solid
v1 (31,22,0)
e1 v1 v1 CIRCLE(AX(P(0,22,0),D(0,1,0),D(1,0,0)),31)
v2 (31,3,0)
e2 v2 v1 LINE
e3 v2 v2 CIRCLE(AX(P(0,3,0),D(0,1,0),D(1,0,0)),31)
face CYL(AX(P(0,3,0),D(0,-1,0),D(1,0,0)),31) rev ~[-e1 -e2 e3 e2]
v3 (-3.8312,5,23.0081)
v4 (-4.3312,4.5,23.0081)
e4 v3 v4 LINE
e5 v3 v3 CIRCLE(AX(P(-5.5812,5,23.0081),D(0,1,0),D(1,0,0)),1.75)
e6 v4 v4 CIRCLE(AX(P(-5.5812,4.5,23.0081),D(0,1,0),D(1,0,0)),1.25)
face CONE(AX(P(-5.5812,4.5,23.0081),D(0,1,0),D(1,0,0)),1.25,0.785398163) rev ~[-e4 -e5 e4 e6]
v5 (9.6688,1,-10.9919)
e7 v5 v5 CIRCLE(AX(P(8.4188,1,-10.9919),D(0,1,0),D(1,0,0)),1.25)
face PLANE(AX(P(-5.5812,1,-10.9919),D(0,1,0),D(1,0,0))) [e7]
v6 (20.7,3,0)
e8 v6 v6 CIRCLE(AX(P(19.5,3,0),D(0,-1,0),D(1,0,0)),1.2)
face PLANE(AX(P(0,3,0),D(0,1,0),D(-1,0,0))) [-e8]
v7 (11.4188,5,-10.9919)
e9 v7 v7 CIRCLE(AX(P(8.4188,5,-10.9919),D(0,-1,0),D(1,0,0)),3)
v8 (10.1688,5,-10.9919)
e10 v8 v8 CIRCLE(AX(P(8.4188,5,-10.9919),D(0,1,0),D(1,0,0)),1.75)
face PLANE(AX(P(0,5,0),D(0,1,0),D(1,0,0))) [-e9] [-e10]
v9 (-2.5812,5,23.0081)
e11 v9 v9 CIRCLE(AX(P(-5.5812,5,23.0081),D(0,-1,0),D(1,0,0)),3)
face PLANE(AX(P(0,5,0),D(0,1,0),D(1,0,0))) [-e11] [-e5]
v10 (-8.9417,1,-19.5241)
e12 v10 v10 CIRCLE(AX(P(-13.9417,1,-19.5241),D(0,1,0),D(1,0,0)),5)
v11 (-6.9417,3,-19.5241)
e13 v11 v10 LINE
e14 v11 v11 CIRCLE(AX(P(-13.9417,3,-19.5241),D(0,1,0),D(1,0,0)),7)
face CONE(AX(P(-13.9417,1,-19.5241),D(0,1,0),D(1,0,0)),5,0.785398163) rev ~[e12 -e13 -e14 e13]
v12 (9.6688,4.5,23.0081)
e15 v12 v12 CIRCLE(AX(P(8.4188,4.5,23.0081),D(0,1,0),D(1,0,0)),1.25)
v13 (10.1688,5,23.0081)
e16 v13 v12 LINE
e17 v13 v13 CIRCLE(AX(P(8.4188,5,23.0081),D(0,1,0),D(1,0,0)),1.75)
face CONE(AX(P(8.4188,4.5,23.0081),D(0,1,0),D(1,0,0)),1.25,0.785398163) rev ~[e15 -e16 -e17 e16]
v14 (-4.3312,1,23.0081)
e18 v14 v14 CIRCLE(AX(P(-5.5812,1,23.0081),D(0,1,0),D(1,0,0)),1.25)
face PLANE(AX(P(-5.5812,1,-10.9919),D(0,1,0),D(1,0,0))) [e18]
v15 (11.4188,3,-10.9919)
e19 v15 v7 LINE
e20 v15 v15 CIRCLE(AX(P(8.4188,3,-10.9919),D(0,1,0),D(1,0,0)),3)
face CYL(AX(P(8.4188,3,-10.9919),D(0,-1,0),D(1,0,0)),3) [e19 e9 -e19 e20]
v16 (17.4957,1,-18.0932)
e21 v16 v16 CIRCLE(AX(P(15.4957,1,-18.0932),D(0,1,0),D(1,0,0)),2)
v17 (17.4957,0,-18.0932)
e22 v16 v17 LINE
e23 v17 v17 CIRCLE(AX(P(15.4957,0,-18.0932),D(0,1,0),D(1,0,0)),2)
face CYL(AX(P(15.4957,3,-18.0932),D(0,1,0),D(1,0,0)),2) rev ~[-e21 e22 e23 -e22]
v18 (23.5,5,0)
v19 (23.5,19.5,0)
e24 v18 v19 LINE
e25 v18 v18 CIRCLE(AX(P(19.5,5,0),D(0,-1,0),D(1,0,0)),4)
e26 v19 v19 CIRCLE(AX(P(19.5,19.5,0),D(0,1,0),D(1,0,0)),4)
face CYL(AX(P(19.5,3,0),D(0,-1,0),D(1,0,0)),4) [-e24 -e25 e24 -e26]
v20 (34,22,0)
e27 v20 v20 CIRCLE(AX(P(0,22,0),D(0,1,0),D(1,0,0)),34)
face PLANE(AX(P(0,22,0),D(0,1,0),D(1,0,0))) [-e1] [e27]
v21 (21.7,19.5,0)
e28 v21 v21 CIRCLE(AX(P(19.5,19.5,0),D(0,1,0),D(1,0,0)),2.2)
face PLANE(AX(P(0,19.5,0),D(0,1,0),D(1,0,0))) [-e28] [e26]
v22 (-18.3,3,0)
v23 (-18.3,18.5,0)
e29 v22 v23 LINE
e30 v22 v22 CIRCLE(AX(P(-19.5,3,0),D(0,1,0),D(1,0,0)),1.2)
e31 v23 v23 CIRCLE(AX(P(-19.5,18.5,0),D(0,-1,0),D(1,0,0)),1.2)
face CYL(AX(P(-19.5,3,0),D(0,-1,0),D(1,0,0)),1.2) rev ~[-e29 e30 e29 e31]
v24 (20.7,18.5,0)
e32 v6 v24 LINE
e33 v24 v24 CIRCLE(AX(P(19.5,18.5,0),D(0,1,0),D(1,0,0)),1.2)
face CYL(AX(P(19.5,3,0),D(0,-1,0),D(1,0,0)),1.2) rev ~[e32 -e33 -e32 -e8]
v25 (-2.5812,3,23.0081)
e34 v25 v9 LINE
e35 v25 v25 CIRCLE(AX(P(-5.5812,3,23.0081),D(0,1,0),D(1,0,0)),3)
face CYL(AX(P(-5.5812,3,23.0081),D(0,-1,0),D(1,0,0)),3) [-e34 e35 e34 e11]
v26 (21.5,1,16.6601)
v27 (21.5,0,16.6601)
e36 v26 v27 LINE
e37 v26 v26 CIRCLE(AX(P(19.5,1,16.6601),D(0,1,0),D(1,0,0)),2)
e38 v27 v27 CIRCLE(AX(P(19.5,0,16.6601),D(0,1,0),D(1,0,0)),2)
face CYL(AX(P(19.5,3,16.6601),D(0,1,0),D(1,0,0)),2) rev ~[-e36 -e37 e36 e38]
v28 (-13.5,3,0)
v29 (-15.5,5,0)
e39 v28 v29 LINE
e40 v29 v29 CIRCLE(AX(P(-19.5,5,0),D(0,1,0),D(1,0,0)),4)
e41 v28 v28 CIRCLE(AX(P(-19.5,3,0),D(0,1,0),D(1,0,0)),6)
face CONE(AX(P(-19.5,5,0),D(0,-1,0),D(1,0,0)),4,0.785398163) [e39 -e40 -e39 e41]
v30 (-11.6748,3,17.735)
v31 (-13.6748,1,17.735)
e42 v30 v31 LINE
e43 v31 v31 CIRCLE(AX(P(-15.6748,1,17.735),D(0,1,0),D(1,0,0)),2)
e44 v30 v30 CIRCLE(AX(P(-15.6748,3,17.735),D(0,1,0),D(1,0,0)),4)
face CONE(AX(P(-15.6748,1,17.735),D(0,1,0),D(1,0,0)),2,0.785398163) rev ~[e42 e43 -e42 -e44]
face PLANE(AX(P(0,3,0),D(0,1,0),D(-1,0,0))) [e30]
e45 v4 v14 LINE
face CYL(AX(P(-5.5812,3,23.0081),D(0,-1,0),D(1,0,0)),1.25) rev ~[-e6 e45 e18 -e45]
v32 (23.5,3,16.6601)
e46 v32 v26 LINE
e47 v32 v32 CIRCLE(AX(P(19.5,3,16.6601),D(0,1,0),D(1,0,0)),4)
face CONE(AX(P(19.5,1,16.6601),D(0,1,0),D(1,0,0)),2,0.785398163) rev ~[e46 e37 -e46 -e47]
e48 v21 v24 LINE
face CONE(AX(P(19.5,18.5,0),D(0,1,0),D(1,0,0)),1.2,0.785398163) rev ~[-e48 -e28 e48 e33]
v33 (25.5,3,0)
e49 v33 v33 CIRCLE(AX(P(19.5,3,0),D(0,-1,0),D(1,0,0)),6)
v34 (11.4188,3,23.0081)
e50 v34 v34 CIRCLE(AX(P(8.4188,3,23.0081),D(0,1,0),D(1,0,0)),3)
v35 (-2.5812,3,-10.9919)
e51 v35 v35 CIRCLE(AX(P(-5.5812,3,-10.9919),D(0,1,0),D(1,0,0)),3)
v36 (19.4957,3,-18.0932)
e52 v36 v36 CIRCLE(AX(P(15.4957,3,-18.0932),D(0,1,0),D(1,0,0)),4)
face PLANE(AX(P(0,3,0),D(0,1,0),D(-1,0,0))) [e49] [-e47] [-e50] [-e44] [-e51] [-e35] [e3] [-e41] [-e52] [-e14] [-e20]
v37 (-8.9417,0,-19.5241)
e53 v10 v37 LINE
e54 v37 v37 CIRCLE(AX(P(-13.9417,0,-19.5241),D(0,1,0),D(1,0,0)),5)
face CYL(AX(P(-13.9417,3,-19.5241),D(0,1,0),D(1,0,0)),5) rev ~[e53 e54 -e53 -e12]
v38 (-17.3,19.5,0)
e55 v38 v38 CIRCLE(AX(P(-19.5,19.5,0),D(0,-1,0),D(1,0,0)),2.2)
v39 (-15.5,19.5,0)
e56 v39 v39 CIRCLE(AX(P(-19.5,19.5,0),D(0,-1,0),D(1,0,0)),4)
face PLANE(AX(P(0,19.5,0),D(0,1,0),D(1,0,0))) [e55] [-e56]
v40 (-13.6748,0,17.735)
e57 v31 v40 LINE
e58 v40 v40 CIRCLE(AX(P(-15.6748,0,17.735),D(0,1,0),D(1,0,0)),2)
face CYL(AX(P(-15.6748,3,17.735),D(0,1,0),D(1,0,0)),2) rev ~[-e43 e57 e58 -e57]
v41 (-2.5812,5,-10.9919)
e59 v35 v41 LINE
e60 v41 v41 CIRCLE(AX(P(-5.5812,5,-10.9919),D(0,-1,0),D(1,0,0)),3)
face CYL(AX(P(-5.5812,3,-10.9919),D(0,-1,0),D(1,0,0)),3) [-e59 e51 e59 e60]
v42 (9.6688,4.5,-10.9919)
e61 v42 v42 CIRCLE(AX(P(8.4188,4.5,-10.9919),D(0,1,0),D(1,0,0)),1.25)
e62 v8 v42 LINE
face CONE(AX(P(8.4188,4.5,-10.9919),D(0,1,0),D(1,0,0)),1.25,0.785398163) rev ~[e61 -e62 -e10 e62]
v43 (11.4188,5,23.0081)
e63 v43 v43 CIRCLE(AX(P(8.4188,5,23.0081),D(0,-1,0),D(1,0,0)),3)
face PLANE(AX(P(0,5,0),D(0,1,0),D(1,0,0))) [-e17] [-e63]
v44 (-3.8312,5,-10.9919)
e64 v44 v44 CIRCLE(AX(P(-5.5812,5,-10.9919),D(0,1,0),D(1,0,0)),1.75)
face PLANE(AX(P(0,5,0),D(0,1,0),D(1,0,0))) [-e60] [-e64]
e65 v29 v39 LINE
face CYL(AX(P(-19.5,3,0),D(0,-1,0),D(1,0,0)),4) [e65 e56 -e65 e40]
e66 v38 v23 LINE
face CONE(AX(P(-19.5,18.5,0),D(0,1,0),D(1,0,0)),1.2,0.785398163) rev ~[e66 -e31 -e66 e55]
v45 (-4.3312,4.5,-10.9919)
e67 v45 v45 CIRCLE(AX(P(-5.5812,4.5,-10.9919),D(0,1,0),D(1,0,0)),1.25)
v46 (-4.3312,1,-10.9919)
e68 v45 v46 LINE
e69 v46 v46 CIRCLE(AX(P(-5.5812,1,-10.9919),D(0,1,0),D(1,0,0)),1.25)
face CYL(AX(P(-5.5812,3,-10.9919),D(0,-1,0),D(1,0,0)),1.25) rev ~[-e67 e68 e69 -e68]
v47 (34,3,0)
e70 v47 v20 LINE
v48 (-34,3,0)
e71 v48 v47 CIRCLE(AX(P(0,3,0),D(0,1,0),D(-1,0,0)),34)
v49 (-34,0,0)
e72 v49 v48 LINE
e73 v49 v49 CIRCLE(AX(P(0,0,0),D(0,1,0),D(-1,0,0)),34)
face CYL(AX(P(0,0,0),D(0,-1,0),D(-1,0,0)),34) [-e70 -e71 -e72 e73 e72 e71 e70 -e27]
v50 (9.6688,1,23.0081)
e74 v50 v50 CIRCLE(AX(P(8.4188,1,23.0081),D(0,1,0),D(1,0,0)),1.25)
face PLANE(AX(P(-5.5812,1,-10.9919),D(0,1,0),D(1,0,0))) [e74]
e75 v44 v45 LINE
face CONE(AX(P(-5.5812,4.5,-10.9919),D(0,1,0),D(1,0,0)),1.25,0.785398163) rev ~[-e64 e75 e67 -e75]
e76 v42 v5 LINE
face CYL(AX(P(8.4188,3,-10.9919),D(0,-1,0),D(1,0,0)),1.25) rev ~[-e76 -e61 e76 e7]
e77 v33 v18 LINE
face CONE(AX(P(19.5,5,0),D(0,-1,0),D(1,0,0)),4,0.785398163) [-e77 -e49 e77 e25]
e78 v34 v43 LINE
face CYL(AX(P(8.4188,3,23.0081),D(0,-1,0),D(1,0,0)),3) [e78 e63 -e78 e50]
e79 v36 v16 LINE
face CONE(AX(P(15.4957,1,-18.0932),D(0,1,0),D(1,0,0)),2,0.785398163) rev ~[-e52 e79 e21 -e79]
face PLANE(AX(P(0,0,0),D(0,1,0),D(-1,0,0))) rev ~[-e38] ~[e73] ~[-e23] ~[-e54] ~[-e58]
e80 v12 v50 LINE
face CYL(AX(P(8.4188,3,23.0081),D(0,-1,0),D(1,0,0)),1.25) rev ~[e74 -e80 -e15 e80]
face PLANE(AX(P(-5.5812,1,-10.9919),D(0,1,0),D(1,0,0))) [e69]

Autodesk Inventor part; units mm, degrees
ref_plane "YZ Plane" through (0, 0, 0) normal (1, 0, 0) x (0, 1, 0)
ref_plane "XZ Plane" through (0, 0, 0) normal (0, 1, 0) x (-1, 0, 0)
ref_plane "XY Plane" through (0, 0, 0) normal (0, 0, 1) x (1, 0, 0)
sketch "Sketch1" plane through (0, 0, 0) normal (0, 1, 0) x (-1, 0, 0)
  circle A0 centre (0, 0) radius 34
  dimension "d0" = 68
extrude "Extrusion1" add sketch "Sketch1" along normal blind 3
sketch "Sketch2" plane through (0, 3, 0) normal (0, 1, 0) x (1, 0, 0)
  circle A0 centre (0, 0) radius 34 projected
  circle A1 centre (0, 0) radius 31
  dimension "d3" = 62
extrude "Extrusion2" add sketch "Sketch2" along normal blind 19
sketch "Sketch3" plane through (0, 3, 0) normal (0, 1, 0) x (1, 0, 0)
  circle A0 centre (0, 0) radius 31 projected
  circle A1 centre (0, 0) radius 19.5
  line L0 (-19.5, 0) -> (19.5, 0)
  circle A2 centre (-19.5, 0) radius 1.2
  circle A3 centre (-19.5, 0) radius 4
  circle A4 centre (19.5, 0) radius 1.2
  circle A5 centre (19.5, 0) radius 4
  dimension "d6" = 39
  dimension "d7" = 2.4
  dimension "d8" = 8
  dimension "d9" = 2.4
  dimension "d10" = 8
extrude "Extrusion3" add sketch "Sketch3" along normal blind 16.5 contours A4 L0 A5 A1 | A1 A5 A4 | A1 A5 L0 A4 | A3 L0 A2 A1 | A1 A2 A3 | A1 A2 L0 A3
chamfer "Chamfer1" distance 2 angle 45 2 edges at (-23.5, 3, 0) (15.5, 3, 0)
sketch "Sketch4" plane through (0, 3, 0) normal (0, 1, 0) x (1, 0, 0)
  circle A0 centre (-13.9417, 19.5241) radius 5
  dimension "d16" = 10
extrude "Extrusion4" cut sketch "Sketch4" against normal blind 14
chamfer "Chamfer2" distance 2 angle 45 1 edges at (-18.9417, 3, -19.5241)
sketch "Sketch5" plane through (0, 3, 0) normal (0, 1, 0) x (1, 0, 0)
  line L0 (-8.5812, 13.9919) -> (11.4188, 13.9919)
  line L1 (11.4188, 13.9919) -> (11.4188, -26.0081)
  line L2 (11.4188, -26.0081) -> (-8.5812, -26.0081)
  line L3 (-8.5812, -26.0081) -> (-8.5812, 13.9919)
  circle A0 centre (-5.5812, 10.9919) radius 1.25
  circle A1 centre (-5.5812, 10.9919) radius 3
  circle A2 centre (8.4188, 10.9919) radius 1.25
  circle A3 centre (8.4188, 10.9919) radius 3
  circle A4 centre (8.4188, -23.0081) radius 1.25
  circle A5 centre (8.4188, -23.0081) radius 3
  circle A6 centre (-5.5812, -23.0081) radius 1.25
  circle A7 centre (-5.5812, -23.0081) radius 3
  dimension "d22" = 20
  dimension "d23" = 40
  dimension "d24" = 2.5
  dimension "d25" = 6
  dimension "d26" = 2.5
  dimension "d27" = 6
  dimension "d28" = 2.5
  dimension "d29" = 6
  dimension "d30" = 2.5
  dimension "d31" = 6
  dimension "d32" = 3
  dimension "d33" = 3
  dimension "d34" = 3
  dimension "d35" = 3
  dimension "d36" = 3
  dimension "d37" = 3
  dimension "d38" = 3
  dimension "d39" = 3
extrude "Extrusion5" add sketch "Sketch5" along normal blind 2 contours A1 | A3 | A7 | A5
sketch "Sketch6" plane through (-5.5812, 3, -10.9919) normal (0, 1, 0) x (1, 0, 0)
  circle A0 centre (0, 0) radius 1.25 projected
  circle A1 centre (0, 0) radius 1.25 projected
  circle A2 centre (14, 0) radius 1.25 projected
  circle A3 centre (14, -34) radius 1.25 projected
  circle A4 centre (0, -34) radius 1.25 projected
  point P0 (5.5812, -10.9919)
extrude "Extrusion6" cut sketch "Sketch6" against normal blind 2
chamfer "Chamfer3" distance 0.5 angle 45 4 edges at (-6.8312, 5, -10.9919) (7.1688, 5, -10.9919) (-6.8312, 5, 23.0081) (7.1688, 5, 23.0081)
chamfer "Chamfer4" distance 1 angle 45 2 edges at (18.3, 19.5, 0) (-20.7, 19.5, 0)
sketch "Sketch7" plane through (0, 3, 0) normal (0, 1, 0) x (1, 0, 0)
  circle A0 centre (-15.6748, -17.735) radius 2
  circle A1 centre (15.4957, 18.0932) radius 2
  circle A2 centre (19.5, -16.6601) radius 2
  dimension "d50" = 4
  dimension "d51" = 4
  dimension "d52" = 4
extrude "Extrusion7" cut sketch "Sketch7" against normal blind 10
chamfer "Chamfer5" distance 2 angle 45 3 edges at (17.5, 3, 16.6601) (-17.6748, 3, 17.735) (13.4957, 3, -18.0932)
properties part number "obudowa - czujnik dymu v2"
